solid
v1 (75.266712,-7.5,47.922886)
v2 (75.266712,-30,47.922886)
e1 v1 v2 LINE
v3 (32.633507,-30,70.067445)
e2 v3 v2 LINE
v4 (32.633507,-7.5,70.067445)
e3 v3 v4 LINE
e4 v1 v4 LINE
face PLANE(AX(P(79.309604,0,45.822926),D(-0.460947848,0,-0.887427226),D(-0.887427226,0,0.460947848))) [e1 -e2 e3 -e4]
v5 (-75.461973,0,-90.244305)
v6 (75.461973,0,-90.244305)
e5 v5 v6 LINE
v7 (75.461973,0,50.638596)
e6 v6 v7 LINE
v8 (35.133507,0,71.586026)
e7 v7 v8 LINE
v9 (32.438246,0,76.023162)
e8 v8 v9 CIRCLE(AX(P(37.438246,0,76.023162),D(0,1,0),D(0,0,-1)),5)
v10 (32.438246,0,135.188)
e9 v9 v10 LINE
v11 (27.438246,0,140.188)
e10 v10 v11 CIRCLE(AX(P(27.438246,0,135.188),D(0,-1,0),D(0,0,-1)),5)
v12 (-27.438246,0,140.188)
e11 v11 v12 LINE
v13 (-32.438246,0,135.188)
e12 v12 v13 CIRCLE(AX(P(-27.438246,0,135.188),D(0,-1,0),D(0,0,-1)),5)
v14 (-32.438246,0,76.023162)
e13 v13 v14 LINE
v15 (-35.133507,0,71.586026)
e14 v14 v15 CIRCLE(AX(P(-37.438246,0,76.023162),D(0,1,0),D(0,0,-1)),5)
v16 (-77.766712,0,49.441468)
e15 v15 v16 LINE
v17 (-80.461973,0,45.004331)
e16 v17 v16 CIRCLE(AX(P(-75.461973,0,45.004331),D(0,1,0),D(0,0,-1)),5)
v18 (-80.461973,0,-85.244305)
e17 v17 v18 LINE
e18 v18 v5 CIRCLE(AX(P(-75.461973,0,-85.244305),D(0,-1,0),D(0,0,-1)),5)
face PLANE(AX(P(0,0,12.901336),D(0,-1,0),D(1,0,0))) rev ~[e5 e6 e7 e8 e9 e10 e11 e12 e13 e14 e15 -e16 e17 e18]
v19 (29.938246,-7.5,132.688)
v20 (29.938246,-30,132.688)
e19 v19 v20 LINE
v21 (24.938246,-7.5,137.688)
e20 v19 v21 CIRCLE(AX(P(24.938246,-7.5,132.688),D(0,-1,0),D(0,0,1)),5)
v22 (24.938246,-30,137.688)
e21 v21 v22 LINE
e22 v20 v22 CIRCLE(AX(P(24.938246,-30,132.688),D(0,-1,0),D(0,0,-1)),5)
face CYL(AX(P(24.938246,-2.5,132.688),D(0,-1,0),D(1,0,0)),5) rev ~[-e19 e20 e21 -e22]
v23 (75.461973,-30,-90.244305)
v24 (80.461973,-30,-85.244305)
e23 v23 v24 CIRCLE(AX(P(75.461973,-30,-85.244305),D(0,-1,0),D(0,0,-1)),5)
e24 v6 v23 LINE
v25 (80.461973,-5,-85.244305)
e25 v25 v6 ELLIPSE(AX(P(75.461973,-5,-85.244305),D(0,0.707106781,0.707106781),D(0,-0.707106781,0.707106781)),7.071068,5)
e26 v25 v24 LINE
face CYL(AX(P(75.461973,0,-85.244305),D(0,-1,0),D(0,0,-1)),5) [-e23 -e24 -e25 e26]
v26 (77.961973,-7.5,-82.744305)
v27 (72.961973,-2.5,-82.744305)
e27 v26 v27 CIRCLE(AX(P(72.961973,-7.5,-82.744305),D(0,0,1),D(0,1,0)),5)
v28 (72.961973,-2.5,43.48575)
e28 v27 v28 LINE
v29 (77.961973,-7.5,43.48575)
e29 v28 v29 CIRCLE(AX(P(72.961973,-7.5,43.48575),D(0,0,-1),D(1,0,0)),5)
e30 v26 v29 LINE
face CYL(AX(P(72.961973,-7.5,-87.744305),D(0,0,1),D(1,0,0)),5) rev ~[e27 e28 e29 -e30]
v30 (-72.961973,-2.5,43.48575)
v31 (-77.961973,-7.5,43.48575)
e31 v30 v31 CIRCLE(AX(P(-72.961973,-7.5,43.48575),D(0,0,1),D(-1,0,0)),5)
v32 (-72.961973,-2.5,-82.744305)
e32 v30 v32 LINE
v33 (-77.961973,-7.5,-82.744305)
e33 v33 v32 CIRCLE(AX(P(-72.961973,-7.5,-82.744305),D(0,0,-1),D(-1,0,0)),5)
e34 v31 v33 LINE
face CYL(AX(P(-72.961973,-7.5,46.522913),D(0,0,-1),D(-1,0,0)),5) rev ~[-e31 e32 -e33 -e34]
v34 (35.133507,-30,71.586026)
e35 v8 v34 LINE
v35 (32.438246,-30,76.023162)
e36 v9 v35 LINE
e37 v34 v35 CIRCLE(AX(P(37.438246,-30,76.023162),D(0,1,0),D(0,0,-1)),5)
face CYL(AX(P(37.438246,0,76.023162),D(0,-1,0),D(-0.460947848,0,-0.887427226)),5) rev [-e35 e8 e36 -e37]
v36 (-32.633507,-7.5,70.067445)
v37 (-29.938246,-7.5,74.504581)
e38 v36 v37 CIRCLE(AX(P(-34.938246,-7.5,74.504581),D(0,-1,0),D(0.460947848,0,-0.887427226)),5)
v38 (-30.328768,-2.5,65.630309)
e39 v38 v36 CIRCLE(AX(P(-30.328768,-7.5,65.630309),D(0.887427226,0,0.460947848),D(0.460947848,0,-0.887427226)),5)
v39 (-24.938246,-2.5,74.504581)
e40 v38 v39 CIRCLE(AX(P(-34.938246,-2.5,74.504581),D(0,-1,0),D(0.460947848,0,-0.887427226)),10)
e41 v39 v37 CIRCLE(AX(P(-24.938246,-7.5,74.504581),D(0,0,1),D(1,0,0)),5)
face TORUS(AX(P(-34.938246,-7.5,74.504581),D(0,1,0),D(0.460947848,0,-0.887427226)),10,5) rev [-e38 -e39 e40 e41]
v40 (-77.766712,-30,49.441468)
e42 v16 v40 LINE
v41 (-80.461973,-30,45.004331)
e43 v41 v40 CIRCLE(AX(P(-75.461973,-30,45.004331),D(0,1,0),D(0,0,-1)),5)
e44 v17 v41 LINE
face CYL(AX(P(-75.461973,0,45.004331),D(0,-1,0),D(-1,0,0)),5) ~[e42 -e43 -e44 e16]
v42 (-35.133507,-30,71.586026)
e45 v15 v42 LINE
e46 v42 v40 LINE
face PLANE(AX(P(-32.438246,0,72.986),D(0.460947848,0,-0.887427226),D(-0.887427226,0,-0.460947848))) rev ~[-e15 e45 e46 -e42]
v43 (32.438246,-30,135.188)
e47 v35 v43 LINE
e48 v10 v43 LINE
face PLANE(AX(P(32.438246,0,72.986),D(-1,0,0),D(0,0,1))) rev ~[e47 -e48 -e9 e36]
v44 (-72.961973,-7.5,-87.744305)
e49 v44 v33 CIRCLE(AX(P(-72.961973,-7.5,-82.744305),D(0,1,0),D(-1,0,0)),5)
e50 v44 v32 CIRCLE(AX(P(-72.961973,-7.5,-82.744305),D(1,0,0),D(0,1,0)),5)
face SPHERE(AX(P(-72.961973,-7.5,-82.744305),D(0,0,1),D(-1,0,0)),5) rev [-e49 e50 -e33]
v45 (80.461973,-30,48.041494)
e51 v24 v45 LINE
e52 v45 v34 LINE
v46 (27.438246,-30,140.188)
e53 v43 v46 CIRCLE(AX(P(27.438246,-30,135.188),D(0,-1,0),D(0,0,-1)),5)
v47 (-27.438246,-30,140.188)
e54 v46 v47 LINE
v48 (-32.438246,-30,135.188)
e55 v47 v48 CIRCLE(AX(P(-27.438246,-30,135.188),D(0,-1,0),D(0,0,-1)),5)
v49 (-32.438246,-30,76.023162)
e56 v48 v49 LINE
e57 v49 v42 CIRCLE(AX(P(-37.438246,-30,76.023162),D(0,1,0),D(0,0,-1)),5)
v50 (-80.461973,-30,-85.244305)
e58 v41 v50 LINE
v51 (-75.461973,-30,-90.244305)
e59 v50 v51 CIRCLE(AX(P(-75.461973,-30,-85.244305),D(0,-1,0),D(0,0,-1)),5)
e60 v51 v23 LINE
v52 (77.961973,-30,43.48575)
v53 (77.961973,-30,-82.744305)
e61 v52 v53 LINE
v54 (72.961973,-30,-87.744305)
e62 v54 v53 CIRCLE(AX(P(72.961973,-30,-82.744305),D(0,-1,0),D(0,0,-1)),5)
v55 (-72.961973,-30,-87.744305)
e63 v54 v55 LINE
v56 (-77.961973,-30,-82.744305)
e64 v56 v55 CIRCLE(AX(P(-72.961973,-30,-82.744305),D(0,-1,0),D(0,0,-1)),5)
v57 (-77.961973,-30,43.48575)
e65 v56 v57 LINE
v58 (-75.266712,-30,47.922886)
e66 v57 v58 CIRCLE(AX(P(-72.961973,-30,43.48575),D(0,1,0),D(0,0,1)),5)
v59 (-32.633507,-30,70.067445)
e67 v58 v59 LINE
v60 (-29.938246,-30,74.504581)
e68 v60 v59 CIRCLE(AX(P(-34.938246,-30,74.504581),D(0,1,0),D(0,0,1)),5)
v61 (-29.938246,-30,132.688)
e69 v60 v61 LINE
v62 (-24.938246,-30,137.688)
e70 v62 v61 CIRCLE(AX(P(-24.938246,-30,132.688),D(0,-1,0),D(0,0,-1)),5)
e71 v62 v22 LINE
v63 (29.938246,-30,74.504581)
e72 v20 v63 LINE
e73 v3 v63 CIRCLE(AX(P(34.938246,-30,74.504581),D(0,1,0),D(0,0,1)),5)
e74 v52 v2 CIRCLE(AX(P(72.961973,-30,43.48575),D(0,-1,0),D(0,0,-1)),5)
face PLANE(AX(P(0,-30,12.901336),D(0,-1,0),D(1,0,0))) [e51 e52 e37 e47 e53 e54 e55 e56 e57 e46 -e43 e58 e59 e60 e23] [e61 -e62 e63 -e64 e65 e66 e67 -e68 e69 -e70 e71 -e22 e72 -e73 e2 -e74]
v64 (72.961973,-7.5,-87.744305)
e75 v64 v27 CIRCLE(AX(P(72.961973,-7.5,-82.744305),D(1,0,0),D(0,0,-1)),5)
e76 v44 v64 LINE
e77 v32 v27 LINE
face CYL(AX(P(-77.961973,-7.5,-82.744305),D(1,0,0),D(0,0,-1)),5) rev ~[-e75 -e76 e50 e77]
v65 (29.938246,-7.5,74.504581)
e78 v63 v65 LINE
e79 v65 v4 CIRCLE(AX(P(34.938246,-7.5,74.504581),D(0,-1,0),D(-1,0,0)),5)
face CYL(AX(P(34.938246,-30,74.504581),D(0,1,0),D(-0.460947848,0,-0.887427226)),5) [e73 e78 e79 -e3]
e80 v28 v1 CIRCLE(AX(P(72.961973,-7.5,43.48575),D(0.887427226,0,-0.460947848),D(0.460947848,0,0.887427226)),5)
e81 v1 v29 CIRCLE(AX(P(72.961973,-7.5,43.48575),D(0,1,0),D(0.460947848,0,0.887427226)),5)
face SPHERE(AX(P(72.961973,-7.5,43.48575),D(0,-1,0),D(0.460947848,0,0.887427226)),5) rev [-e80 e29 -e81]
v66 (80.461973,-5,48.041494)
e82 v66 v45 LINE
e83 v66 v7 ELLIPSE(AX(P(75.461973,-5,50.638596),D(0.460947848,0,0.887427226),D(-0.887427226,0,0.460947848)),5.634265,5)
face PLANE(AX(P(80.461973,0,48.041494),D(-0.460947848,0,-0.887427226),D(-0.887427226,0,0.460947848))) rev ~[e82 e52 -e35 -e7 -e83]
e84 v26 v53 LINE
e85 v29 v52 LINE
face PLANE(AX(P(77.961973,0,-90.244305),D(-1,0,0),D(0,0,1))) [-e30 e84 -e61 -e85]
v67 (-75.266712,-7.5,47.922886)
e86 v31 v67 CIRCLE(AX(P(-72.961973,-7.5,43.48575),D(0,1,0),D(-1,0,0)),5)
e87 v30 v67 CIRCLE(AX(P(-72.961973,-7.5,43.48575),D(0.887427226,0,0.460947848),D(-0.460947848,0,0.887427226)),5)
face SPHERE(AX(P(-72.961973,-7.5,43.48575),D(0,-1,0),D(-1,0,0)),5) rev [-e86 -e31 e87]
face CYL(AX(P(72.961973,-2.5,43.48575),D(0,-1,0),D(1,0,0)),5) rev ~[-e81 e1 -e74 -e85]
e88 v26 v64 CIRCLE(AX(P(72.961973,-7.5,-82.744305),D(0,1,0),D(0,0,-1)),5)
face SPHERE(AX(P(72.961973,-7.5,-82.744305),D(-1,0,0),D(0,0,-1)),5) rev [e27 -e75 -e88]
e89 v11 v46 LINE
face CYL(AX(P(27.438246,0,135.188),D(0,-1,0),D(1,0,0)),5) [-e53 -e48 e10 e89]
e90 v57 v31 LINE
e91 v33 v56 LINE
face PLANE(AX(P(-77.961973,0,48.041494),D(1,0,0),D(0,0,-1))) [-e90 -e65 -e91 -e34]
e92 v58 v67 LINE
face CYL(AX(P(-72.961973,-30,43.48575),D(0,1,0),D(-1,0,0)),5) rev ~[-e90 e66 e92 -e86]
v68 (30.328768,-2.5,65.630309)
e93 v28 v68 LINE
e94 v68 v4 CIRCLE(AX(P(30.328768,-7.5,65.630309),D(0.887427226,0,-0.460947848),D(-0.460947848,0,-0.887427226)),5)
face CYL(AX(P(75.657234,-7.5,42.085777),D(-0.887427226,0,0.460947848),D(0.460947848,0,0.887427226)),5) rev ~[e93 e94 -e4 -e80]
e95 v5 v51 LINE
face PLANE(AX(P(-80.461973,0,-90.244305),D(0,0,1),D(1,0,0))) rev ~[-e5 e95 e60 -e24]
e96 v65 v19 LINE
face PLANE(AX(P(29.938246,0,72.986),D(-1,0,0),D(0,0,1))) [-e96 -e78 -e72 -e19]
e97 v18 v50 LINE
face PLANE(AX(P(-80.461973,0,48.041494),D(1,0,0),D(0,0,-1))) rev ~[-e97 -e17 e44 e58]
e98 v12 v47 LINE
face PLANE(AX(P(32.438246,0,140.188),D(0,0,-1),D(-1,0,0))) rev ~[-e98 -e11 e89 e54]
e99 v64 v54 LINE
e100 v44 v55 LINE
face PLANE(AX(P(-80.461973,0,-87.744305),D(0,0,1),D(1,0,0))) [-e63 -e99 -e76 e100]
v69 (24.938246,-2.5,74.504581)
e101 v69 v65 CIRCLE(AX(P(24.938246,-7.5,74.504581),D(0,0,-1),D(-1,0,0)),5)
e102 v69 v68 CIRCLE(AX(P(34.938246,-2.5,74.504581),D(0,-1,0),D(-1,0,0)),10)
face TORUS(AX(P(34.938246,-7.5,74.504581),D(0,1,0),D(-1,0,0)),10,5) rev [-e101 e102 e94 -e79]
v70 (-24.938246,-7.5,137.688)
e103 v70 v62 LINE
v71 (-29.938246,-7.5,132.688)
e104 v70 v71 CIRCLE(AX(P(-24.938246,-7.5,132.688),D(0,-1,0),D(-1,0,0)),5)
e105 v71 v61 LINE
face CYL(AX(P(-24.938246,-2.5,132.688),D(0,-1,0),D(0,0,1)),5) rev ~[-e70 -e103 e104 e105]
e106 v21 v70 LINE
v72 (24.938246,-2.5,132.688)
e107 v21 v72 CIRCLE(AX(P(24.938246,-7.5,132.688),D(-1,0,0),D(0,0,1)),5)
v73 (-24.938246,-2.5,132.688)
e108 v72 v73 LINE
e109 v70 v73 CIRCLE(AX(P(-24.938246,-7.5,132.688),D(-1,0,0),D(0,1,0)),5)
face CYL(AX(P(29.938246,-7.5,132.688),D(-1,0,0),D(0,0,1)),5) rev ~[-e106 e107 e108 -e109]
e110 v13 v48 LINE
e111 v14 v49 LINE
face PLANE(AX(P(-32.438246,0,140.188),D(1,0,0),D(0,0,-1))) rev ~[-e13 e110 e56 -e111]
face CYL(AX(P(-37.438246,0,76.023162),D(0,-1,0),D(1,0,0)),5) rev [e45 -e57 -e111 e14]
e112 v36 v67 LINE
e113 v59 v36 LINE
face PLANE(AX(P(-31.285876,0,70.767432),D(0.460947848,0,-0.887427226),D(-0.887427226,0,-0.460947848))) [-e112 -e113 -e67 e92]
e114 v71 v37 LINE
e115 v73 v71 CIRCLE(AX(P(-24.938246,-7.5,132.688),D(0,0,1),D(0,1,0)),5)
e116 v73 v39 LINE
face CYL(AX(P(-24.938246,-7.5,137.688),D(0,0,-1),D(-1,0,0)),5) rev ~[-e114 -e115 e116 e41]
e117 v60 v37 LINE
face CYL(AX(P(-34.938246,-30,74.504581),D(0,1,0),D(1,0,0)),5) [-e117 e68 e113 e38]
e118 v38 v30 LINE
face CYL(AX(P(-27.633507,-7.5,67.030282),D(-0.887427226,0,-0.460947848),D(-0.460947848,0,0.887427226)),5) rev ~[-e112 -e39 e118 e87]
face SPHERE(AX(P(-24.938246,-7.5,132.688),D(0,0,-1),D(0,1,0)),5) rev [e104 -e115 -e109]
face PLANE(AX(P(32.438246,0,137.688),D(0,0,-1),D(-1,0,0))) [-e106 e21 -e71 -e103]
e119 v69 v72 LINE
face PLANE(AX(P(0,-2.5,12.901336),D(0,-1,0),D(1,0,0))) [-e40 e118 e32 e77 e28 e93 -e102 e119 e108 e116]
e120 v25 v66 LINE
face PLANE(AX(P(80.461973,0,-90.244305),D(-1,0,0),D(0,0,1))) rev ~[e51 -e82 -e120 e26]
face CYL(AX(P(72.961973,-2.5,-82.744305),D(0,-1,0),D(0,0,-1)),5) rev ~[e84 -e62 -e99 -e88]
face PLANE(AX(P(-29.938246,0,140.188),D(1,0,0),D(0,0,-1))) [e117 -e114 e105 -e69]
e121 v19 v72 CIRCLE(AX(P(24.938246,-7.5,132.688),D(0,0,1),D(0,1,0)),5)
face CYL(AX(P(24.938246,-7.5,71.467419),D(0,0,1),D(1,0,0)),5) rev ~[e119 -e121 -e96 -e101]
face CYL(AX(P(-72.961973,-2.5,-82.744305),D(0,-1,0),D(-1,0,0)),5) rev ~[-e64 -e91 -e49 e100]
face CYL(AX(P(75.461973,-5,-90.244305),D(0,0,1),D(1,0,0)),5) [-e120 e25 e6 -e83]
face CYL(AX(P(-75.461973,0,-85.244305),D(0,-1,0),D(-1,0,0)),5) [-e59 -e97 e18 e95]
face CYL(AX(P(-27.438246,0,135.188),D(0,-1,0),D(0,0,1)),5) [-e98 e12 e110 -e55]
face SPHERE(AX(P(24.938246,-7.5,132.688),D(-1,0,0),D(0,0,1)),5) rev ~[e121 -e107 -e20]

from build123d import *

# Parameters (mm, degrees)
F1_DEPTH = 30
F2_T     = -2.5
F3_R     = 5
F4_R     = 5


with BuildPart() as f1:
    # F0 (on Front) → F1 (new body)
    with BuildSketch(Plane.XZ):
        Polygon((-80.4619731335, 48.0414940363), (-80.4619731335, -90.2443051724), (80.4619731335, -90.2443051724), (80.4619731335, 48.0414940363), (32.4382460701, 72.9859998765), (32.4382460701, 140.1879998765), (-32.4382460701, 140.1879998765), (-32.4382460701, 72.9859998765), align=None)
    extrude(amount=F1_DEPTH)

    # F2
    f2_openings = [f1.faces().sort_by_distance(p)[0] for p in [
        (0, -30, 5.455809),
    ]]
    offset(amount=F2_T, openings=f2_openings, kind=Kind.INTERSECTION)

    # F3
    f3_edges = [f1.edges().sort_by_distance(p)[0] for p in [
        (-77.961973, -2.5, -20.610696),
        (-53.95011, -2.5, 58.995166),
        (-29.938246, -2.5, 104.577709),
        (0, -2.5, 137.688),
        (29.938246, -16.25, 137.688),
        (29.938246, -2.5, 104.577709),
        (53.95011, -2.5, 58.995166),
        (29.938246, -16.25, 71.467419),
        (-29.938246, -16.25, 71.467419),
        (-77.961973, -16.25, -87.744305),
        (0, -2.5, -87.744305),
        (77.961973, -16.25, -87.744305),
        (77.961973, -2.5, -20.610696),
        (-77.961973, -16.25, 46.522913),
        (-29.938246, -16.25, 137.688),
        (77.961973, -16.25, 46.522913),
    ]]
    fillet(f3_edges, radius=F3_R)

    # F4
    f4_edges = [f1.edges().sort_by_distance(p)[0] for p in [
        (32.438246, -15, 140.188),
        (80.461973, 0, -21.101406),
        (-32.438246, -15, 140.188),
        (-32.438246, -15, 72.986),
        (32.438246, -15, 72.986),
        (-80.461973, -15, 48.041494),
        (-80.461973, -15, -90.244305),
        (80.461973, -15, -90.244305),
    ]]
    fillet(f4_edges, radius=F4_R)


solid = f1.part
